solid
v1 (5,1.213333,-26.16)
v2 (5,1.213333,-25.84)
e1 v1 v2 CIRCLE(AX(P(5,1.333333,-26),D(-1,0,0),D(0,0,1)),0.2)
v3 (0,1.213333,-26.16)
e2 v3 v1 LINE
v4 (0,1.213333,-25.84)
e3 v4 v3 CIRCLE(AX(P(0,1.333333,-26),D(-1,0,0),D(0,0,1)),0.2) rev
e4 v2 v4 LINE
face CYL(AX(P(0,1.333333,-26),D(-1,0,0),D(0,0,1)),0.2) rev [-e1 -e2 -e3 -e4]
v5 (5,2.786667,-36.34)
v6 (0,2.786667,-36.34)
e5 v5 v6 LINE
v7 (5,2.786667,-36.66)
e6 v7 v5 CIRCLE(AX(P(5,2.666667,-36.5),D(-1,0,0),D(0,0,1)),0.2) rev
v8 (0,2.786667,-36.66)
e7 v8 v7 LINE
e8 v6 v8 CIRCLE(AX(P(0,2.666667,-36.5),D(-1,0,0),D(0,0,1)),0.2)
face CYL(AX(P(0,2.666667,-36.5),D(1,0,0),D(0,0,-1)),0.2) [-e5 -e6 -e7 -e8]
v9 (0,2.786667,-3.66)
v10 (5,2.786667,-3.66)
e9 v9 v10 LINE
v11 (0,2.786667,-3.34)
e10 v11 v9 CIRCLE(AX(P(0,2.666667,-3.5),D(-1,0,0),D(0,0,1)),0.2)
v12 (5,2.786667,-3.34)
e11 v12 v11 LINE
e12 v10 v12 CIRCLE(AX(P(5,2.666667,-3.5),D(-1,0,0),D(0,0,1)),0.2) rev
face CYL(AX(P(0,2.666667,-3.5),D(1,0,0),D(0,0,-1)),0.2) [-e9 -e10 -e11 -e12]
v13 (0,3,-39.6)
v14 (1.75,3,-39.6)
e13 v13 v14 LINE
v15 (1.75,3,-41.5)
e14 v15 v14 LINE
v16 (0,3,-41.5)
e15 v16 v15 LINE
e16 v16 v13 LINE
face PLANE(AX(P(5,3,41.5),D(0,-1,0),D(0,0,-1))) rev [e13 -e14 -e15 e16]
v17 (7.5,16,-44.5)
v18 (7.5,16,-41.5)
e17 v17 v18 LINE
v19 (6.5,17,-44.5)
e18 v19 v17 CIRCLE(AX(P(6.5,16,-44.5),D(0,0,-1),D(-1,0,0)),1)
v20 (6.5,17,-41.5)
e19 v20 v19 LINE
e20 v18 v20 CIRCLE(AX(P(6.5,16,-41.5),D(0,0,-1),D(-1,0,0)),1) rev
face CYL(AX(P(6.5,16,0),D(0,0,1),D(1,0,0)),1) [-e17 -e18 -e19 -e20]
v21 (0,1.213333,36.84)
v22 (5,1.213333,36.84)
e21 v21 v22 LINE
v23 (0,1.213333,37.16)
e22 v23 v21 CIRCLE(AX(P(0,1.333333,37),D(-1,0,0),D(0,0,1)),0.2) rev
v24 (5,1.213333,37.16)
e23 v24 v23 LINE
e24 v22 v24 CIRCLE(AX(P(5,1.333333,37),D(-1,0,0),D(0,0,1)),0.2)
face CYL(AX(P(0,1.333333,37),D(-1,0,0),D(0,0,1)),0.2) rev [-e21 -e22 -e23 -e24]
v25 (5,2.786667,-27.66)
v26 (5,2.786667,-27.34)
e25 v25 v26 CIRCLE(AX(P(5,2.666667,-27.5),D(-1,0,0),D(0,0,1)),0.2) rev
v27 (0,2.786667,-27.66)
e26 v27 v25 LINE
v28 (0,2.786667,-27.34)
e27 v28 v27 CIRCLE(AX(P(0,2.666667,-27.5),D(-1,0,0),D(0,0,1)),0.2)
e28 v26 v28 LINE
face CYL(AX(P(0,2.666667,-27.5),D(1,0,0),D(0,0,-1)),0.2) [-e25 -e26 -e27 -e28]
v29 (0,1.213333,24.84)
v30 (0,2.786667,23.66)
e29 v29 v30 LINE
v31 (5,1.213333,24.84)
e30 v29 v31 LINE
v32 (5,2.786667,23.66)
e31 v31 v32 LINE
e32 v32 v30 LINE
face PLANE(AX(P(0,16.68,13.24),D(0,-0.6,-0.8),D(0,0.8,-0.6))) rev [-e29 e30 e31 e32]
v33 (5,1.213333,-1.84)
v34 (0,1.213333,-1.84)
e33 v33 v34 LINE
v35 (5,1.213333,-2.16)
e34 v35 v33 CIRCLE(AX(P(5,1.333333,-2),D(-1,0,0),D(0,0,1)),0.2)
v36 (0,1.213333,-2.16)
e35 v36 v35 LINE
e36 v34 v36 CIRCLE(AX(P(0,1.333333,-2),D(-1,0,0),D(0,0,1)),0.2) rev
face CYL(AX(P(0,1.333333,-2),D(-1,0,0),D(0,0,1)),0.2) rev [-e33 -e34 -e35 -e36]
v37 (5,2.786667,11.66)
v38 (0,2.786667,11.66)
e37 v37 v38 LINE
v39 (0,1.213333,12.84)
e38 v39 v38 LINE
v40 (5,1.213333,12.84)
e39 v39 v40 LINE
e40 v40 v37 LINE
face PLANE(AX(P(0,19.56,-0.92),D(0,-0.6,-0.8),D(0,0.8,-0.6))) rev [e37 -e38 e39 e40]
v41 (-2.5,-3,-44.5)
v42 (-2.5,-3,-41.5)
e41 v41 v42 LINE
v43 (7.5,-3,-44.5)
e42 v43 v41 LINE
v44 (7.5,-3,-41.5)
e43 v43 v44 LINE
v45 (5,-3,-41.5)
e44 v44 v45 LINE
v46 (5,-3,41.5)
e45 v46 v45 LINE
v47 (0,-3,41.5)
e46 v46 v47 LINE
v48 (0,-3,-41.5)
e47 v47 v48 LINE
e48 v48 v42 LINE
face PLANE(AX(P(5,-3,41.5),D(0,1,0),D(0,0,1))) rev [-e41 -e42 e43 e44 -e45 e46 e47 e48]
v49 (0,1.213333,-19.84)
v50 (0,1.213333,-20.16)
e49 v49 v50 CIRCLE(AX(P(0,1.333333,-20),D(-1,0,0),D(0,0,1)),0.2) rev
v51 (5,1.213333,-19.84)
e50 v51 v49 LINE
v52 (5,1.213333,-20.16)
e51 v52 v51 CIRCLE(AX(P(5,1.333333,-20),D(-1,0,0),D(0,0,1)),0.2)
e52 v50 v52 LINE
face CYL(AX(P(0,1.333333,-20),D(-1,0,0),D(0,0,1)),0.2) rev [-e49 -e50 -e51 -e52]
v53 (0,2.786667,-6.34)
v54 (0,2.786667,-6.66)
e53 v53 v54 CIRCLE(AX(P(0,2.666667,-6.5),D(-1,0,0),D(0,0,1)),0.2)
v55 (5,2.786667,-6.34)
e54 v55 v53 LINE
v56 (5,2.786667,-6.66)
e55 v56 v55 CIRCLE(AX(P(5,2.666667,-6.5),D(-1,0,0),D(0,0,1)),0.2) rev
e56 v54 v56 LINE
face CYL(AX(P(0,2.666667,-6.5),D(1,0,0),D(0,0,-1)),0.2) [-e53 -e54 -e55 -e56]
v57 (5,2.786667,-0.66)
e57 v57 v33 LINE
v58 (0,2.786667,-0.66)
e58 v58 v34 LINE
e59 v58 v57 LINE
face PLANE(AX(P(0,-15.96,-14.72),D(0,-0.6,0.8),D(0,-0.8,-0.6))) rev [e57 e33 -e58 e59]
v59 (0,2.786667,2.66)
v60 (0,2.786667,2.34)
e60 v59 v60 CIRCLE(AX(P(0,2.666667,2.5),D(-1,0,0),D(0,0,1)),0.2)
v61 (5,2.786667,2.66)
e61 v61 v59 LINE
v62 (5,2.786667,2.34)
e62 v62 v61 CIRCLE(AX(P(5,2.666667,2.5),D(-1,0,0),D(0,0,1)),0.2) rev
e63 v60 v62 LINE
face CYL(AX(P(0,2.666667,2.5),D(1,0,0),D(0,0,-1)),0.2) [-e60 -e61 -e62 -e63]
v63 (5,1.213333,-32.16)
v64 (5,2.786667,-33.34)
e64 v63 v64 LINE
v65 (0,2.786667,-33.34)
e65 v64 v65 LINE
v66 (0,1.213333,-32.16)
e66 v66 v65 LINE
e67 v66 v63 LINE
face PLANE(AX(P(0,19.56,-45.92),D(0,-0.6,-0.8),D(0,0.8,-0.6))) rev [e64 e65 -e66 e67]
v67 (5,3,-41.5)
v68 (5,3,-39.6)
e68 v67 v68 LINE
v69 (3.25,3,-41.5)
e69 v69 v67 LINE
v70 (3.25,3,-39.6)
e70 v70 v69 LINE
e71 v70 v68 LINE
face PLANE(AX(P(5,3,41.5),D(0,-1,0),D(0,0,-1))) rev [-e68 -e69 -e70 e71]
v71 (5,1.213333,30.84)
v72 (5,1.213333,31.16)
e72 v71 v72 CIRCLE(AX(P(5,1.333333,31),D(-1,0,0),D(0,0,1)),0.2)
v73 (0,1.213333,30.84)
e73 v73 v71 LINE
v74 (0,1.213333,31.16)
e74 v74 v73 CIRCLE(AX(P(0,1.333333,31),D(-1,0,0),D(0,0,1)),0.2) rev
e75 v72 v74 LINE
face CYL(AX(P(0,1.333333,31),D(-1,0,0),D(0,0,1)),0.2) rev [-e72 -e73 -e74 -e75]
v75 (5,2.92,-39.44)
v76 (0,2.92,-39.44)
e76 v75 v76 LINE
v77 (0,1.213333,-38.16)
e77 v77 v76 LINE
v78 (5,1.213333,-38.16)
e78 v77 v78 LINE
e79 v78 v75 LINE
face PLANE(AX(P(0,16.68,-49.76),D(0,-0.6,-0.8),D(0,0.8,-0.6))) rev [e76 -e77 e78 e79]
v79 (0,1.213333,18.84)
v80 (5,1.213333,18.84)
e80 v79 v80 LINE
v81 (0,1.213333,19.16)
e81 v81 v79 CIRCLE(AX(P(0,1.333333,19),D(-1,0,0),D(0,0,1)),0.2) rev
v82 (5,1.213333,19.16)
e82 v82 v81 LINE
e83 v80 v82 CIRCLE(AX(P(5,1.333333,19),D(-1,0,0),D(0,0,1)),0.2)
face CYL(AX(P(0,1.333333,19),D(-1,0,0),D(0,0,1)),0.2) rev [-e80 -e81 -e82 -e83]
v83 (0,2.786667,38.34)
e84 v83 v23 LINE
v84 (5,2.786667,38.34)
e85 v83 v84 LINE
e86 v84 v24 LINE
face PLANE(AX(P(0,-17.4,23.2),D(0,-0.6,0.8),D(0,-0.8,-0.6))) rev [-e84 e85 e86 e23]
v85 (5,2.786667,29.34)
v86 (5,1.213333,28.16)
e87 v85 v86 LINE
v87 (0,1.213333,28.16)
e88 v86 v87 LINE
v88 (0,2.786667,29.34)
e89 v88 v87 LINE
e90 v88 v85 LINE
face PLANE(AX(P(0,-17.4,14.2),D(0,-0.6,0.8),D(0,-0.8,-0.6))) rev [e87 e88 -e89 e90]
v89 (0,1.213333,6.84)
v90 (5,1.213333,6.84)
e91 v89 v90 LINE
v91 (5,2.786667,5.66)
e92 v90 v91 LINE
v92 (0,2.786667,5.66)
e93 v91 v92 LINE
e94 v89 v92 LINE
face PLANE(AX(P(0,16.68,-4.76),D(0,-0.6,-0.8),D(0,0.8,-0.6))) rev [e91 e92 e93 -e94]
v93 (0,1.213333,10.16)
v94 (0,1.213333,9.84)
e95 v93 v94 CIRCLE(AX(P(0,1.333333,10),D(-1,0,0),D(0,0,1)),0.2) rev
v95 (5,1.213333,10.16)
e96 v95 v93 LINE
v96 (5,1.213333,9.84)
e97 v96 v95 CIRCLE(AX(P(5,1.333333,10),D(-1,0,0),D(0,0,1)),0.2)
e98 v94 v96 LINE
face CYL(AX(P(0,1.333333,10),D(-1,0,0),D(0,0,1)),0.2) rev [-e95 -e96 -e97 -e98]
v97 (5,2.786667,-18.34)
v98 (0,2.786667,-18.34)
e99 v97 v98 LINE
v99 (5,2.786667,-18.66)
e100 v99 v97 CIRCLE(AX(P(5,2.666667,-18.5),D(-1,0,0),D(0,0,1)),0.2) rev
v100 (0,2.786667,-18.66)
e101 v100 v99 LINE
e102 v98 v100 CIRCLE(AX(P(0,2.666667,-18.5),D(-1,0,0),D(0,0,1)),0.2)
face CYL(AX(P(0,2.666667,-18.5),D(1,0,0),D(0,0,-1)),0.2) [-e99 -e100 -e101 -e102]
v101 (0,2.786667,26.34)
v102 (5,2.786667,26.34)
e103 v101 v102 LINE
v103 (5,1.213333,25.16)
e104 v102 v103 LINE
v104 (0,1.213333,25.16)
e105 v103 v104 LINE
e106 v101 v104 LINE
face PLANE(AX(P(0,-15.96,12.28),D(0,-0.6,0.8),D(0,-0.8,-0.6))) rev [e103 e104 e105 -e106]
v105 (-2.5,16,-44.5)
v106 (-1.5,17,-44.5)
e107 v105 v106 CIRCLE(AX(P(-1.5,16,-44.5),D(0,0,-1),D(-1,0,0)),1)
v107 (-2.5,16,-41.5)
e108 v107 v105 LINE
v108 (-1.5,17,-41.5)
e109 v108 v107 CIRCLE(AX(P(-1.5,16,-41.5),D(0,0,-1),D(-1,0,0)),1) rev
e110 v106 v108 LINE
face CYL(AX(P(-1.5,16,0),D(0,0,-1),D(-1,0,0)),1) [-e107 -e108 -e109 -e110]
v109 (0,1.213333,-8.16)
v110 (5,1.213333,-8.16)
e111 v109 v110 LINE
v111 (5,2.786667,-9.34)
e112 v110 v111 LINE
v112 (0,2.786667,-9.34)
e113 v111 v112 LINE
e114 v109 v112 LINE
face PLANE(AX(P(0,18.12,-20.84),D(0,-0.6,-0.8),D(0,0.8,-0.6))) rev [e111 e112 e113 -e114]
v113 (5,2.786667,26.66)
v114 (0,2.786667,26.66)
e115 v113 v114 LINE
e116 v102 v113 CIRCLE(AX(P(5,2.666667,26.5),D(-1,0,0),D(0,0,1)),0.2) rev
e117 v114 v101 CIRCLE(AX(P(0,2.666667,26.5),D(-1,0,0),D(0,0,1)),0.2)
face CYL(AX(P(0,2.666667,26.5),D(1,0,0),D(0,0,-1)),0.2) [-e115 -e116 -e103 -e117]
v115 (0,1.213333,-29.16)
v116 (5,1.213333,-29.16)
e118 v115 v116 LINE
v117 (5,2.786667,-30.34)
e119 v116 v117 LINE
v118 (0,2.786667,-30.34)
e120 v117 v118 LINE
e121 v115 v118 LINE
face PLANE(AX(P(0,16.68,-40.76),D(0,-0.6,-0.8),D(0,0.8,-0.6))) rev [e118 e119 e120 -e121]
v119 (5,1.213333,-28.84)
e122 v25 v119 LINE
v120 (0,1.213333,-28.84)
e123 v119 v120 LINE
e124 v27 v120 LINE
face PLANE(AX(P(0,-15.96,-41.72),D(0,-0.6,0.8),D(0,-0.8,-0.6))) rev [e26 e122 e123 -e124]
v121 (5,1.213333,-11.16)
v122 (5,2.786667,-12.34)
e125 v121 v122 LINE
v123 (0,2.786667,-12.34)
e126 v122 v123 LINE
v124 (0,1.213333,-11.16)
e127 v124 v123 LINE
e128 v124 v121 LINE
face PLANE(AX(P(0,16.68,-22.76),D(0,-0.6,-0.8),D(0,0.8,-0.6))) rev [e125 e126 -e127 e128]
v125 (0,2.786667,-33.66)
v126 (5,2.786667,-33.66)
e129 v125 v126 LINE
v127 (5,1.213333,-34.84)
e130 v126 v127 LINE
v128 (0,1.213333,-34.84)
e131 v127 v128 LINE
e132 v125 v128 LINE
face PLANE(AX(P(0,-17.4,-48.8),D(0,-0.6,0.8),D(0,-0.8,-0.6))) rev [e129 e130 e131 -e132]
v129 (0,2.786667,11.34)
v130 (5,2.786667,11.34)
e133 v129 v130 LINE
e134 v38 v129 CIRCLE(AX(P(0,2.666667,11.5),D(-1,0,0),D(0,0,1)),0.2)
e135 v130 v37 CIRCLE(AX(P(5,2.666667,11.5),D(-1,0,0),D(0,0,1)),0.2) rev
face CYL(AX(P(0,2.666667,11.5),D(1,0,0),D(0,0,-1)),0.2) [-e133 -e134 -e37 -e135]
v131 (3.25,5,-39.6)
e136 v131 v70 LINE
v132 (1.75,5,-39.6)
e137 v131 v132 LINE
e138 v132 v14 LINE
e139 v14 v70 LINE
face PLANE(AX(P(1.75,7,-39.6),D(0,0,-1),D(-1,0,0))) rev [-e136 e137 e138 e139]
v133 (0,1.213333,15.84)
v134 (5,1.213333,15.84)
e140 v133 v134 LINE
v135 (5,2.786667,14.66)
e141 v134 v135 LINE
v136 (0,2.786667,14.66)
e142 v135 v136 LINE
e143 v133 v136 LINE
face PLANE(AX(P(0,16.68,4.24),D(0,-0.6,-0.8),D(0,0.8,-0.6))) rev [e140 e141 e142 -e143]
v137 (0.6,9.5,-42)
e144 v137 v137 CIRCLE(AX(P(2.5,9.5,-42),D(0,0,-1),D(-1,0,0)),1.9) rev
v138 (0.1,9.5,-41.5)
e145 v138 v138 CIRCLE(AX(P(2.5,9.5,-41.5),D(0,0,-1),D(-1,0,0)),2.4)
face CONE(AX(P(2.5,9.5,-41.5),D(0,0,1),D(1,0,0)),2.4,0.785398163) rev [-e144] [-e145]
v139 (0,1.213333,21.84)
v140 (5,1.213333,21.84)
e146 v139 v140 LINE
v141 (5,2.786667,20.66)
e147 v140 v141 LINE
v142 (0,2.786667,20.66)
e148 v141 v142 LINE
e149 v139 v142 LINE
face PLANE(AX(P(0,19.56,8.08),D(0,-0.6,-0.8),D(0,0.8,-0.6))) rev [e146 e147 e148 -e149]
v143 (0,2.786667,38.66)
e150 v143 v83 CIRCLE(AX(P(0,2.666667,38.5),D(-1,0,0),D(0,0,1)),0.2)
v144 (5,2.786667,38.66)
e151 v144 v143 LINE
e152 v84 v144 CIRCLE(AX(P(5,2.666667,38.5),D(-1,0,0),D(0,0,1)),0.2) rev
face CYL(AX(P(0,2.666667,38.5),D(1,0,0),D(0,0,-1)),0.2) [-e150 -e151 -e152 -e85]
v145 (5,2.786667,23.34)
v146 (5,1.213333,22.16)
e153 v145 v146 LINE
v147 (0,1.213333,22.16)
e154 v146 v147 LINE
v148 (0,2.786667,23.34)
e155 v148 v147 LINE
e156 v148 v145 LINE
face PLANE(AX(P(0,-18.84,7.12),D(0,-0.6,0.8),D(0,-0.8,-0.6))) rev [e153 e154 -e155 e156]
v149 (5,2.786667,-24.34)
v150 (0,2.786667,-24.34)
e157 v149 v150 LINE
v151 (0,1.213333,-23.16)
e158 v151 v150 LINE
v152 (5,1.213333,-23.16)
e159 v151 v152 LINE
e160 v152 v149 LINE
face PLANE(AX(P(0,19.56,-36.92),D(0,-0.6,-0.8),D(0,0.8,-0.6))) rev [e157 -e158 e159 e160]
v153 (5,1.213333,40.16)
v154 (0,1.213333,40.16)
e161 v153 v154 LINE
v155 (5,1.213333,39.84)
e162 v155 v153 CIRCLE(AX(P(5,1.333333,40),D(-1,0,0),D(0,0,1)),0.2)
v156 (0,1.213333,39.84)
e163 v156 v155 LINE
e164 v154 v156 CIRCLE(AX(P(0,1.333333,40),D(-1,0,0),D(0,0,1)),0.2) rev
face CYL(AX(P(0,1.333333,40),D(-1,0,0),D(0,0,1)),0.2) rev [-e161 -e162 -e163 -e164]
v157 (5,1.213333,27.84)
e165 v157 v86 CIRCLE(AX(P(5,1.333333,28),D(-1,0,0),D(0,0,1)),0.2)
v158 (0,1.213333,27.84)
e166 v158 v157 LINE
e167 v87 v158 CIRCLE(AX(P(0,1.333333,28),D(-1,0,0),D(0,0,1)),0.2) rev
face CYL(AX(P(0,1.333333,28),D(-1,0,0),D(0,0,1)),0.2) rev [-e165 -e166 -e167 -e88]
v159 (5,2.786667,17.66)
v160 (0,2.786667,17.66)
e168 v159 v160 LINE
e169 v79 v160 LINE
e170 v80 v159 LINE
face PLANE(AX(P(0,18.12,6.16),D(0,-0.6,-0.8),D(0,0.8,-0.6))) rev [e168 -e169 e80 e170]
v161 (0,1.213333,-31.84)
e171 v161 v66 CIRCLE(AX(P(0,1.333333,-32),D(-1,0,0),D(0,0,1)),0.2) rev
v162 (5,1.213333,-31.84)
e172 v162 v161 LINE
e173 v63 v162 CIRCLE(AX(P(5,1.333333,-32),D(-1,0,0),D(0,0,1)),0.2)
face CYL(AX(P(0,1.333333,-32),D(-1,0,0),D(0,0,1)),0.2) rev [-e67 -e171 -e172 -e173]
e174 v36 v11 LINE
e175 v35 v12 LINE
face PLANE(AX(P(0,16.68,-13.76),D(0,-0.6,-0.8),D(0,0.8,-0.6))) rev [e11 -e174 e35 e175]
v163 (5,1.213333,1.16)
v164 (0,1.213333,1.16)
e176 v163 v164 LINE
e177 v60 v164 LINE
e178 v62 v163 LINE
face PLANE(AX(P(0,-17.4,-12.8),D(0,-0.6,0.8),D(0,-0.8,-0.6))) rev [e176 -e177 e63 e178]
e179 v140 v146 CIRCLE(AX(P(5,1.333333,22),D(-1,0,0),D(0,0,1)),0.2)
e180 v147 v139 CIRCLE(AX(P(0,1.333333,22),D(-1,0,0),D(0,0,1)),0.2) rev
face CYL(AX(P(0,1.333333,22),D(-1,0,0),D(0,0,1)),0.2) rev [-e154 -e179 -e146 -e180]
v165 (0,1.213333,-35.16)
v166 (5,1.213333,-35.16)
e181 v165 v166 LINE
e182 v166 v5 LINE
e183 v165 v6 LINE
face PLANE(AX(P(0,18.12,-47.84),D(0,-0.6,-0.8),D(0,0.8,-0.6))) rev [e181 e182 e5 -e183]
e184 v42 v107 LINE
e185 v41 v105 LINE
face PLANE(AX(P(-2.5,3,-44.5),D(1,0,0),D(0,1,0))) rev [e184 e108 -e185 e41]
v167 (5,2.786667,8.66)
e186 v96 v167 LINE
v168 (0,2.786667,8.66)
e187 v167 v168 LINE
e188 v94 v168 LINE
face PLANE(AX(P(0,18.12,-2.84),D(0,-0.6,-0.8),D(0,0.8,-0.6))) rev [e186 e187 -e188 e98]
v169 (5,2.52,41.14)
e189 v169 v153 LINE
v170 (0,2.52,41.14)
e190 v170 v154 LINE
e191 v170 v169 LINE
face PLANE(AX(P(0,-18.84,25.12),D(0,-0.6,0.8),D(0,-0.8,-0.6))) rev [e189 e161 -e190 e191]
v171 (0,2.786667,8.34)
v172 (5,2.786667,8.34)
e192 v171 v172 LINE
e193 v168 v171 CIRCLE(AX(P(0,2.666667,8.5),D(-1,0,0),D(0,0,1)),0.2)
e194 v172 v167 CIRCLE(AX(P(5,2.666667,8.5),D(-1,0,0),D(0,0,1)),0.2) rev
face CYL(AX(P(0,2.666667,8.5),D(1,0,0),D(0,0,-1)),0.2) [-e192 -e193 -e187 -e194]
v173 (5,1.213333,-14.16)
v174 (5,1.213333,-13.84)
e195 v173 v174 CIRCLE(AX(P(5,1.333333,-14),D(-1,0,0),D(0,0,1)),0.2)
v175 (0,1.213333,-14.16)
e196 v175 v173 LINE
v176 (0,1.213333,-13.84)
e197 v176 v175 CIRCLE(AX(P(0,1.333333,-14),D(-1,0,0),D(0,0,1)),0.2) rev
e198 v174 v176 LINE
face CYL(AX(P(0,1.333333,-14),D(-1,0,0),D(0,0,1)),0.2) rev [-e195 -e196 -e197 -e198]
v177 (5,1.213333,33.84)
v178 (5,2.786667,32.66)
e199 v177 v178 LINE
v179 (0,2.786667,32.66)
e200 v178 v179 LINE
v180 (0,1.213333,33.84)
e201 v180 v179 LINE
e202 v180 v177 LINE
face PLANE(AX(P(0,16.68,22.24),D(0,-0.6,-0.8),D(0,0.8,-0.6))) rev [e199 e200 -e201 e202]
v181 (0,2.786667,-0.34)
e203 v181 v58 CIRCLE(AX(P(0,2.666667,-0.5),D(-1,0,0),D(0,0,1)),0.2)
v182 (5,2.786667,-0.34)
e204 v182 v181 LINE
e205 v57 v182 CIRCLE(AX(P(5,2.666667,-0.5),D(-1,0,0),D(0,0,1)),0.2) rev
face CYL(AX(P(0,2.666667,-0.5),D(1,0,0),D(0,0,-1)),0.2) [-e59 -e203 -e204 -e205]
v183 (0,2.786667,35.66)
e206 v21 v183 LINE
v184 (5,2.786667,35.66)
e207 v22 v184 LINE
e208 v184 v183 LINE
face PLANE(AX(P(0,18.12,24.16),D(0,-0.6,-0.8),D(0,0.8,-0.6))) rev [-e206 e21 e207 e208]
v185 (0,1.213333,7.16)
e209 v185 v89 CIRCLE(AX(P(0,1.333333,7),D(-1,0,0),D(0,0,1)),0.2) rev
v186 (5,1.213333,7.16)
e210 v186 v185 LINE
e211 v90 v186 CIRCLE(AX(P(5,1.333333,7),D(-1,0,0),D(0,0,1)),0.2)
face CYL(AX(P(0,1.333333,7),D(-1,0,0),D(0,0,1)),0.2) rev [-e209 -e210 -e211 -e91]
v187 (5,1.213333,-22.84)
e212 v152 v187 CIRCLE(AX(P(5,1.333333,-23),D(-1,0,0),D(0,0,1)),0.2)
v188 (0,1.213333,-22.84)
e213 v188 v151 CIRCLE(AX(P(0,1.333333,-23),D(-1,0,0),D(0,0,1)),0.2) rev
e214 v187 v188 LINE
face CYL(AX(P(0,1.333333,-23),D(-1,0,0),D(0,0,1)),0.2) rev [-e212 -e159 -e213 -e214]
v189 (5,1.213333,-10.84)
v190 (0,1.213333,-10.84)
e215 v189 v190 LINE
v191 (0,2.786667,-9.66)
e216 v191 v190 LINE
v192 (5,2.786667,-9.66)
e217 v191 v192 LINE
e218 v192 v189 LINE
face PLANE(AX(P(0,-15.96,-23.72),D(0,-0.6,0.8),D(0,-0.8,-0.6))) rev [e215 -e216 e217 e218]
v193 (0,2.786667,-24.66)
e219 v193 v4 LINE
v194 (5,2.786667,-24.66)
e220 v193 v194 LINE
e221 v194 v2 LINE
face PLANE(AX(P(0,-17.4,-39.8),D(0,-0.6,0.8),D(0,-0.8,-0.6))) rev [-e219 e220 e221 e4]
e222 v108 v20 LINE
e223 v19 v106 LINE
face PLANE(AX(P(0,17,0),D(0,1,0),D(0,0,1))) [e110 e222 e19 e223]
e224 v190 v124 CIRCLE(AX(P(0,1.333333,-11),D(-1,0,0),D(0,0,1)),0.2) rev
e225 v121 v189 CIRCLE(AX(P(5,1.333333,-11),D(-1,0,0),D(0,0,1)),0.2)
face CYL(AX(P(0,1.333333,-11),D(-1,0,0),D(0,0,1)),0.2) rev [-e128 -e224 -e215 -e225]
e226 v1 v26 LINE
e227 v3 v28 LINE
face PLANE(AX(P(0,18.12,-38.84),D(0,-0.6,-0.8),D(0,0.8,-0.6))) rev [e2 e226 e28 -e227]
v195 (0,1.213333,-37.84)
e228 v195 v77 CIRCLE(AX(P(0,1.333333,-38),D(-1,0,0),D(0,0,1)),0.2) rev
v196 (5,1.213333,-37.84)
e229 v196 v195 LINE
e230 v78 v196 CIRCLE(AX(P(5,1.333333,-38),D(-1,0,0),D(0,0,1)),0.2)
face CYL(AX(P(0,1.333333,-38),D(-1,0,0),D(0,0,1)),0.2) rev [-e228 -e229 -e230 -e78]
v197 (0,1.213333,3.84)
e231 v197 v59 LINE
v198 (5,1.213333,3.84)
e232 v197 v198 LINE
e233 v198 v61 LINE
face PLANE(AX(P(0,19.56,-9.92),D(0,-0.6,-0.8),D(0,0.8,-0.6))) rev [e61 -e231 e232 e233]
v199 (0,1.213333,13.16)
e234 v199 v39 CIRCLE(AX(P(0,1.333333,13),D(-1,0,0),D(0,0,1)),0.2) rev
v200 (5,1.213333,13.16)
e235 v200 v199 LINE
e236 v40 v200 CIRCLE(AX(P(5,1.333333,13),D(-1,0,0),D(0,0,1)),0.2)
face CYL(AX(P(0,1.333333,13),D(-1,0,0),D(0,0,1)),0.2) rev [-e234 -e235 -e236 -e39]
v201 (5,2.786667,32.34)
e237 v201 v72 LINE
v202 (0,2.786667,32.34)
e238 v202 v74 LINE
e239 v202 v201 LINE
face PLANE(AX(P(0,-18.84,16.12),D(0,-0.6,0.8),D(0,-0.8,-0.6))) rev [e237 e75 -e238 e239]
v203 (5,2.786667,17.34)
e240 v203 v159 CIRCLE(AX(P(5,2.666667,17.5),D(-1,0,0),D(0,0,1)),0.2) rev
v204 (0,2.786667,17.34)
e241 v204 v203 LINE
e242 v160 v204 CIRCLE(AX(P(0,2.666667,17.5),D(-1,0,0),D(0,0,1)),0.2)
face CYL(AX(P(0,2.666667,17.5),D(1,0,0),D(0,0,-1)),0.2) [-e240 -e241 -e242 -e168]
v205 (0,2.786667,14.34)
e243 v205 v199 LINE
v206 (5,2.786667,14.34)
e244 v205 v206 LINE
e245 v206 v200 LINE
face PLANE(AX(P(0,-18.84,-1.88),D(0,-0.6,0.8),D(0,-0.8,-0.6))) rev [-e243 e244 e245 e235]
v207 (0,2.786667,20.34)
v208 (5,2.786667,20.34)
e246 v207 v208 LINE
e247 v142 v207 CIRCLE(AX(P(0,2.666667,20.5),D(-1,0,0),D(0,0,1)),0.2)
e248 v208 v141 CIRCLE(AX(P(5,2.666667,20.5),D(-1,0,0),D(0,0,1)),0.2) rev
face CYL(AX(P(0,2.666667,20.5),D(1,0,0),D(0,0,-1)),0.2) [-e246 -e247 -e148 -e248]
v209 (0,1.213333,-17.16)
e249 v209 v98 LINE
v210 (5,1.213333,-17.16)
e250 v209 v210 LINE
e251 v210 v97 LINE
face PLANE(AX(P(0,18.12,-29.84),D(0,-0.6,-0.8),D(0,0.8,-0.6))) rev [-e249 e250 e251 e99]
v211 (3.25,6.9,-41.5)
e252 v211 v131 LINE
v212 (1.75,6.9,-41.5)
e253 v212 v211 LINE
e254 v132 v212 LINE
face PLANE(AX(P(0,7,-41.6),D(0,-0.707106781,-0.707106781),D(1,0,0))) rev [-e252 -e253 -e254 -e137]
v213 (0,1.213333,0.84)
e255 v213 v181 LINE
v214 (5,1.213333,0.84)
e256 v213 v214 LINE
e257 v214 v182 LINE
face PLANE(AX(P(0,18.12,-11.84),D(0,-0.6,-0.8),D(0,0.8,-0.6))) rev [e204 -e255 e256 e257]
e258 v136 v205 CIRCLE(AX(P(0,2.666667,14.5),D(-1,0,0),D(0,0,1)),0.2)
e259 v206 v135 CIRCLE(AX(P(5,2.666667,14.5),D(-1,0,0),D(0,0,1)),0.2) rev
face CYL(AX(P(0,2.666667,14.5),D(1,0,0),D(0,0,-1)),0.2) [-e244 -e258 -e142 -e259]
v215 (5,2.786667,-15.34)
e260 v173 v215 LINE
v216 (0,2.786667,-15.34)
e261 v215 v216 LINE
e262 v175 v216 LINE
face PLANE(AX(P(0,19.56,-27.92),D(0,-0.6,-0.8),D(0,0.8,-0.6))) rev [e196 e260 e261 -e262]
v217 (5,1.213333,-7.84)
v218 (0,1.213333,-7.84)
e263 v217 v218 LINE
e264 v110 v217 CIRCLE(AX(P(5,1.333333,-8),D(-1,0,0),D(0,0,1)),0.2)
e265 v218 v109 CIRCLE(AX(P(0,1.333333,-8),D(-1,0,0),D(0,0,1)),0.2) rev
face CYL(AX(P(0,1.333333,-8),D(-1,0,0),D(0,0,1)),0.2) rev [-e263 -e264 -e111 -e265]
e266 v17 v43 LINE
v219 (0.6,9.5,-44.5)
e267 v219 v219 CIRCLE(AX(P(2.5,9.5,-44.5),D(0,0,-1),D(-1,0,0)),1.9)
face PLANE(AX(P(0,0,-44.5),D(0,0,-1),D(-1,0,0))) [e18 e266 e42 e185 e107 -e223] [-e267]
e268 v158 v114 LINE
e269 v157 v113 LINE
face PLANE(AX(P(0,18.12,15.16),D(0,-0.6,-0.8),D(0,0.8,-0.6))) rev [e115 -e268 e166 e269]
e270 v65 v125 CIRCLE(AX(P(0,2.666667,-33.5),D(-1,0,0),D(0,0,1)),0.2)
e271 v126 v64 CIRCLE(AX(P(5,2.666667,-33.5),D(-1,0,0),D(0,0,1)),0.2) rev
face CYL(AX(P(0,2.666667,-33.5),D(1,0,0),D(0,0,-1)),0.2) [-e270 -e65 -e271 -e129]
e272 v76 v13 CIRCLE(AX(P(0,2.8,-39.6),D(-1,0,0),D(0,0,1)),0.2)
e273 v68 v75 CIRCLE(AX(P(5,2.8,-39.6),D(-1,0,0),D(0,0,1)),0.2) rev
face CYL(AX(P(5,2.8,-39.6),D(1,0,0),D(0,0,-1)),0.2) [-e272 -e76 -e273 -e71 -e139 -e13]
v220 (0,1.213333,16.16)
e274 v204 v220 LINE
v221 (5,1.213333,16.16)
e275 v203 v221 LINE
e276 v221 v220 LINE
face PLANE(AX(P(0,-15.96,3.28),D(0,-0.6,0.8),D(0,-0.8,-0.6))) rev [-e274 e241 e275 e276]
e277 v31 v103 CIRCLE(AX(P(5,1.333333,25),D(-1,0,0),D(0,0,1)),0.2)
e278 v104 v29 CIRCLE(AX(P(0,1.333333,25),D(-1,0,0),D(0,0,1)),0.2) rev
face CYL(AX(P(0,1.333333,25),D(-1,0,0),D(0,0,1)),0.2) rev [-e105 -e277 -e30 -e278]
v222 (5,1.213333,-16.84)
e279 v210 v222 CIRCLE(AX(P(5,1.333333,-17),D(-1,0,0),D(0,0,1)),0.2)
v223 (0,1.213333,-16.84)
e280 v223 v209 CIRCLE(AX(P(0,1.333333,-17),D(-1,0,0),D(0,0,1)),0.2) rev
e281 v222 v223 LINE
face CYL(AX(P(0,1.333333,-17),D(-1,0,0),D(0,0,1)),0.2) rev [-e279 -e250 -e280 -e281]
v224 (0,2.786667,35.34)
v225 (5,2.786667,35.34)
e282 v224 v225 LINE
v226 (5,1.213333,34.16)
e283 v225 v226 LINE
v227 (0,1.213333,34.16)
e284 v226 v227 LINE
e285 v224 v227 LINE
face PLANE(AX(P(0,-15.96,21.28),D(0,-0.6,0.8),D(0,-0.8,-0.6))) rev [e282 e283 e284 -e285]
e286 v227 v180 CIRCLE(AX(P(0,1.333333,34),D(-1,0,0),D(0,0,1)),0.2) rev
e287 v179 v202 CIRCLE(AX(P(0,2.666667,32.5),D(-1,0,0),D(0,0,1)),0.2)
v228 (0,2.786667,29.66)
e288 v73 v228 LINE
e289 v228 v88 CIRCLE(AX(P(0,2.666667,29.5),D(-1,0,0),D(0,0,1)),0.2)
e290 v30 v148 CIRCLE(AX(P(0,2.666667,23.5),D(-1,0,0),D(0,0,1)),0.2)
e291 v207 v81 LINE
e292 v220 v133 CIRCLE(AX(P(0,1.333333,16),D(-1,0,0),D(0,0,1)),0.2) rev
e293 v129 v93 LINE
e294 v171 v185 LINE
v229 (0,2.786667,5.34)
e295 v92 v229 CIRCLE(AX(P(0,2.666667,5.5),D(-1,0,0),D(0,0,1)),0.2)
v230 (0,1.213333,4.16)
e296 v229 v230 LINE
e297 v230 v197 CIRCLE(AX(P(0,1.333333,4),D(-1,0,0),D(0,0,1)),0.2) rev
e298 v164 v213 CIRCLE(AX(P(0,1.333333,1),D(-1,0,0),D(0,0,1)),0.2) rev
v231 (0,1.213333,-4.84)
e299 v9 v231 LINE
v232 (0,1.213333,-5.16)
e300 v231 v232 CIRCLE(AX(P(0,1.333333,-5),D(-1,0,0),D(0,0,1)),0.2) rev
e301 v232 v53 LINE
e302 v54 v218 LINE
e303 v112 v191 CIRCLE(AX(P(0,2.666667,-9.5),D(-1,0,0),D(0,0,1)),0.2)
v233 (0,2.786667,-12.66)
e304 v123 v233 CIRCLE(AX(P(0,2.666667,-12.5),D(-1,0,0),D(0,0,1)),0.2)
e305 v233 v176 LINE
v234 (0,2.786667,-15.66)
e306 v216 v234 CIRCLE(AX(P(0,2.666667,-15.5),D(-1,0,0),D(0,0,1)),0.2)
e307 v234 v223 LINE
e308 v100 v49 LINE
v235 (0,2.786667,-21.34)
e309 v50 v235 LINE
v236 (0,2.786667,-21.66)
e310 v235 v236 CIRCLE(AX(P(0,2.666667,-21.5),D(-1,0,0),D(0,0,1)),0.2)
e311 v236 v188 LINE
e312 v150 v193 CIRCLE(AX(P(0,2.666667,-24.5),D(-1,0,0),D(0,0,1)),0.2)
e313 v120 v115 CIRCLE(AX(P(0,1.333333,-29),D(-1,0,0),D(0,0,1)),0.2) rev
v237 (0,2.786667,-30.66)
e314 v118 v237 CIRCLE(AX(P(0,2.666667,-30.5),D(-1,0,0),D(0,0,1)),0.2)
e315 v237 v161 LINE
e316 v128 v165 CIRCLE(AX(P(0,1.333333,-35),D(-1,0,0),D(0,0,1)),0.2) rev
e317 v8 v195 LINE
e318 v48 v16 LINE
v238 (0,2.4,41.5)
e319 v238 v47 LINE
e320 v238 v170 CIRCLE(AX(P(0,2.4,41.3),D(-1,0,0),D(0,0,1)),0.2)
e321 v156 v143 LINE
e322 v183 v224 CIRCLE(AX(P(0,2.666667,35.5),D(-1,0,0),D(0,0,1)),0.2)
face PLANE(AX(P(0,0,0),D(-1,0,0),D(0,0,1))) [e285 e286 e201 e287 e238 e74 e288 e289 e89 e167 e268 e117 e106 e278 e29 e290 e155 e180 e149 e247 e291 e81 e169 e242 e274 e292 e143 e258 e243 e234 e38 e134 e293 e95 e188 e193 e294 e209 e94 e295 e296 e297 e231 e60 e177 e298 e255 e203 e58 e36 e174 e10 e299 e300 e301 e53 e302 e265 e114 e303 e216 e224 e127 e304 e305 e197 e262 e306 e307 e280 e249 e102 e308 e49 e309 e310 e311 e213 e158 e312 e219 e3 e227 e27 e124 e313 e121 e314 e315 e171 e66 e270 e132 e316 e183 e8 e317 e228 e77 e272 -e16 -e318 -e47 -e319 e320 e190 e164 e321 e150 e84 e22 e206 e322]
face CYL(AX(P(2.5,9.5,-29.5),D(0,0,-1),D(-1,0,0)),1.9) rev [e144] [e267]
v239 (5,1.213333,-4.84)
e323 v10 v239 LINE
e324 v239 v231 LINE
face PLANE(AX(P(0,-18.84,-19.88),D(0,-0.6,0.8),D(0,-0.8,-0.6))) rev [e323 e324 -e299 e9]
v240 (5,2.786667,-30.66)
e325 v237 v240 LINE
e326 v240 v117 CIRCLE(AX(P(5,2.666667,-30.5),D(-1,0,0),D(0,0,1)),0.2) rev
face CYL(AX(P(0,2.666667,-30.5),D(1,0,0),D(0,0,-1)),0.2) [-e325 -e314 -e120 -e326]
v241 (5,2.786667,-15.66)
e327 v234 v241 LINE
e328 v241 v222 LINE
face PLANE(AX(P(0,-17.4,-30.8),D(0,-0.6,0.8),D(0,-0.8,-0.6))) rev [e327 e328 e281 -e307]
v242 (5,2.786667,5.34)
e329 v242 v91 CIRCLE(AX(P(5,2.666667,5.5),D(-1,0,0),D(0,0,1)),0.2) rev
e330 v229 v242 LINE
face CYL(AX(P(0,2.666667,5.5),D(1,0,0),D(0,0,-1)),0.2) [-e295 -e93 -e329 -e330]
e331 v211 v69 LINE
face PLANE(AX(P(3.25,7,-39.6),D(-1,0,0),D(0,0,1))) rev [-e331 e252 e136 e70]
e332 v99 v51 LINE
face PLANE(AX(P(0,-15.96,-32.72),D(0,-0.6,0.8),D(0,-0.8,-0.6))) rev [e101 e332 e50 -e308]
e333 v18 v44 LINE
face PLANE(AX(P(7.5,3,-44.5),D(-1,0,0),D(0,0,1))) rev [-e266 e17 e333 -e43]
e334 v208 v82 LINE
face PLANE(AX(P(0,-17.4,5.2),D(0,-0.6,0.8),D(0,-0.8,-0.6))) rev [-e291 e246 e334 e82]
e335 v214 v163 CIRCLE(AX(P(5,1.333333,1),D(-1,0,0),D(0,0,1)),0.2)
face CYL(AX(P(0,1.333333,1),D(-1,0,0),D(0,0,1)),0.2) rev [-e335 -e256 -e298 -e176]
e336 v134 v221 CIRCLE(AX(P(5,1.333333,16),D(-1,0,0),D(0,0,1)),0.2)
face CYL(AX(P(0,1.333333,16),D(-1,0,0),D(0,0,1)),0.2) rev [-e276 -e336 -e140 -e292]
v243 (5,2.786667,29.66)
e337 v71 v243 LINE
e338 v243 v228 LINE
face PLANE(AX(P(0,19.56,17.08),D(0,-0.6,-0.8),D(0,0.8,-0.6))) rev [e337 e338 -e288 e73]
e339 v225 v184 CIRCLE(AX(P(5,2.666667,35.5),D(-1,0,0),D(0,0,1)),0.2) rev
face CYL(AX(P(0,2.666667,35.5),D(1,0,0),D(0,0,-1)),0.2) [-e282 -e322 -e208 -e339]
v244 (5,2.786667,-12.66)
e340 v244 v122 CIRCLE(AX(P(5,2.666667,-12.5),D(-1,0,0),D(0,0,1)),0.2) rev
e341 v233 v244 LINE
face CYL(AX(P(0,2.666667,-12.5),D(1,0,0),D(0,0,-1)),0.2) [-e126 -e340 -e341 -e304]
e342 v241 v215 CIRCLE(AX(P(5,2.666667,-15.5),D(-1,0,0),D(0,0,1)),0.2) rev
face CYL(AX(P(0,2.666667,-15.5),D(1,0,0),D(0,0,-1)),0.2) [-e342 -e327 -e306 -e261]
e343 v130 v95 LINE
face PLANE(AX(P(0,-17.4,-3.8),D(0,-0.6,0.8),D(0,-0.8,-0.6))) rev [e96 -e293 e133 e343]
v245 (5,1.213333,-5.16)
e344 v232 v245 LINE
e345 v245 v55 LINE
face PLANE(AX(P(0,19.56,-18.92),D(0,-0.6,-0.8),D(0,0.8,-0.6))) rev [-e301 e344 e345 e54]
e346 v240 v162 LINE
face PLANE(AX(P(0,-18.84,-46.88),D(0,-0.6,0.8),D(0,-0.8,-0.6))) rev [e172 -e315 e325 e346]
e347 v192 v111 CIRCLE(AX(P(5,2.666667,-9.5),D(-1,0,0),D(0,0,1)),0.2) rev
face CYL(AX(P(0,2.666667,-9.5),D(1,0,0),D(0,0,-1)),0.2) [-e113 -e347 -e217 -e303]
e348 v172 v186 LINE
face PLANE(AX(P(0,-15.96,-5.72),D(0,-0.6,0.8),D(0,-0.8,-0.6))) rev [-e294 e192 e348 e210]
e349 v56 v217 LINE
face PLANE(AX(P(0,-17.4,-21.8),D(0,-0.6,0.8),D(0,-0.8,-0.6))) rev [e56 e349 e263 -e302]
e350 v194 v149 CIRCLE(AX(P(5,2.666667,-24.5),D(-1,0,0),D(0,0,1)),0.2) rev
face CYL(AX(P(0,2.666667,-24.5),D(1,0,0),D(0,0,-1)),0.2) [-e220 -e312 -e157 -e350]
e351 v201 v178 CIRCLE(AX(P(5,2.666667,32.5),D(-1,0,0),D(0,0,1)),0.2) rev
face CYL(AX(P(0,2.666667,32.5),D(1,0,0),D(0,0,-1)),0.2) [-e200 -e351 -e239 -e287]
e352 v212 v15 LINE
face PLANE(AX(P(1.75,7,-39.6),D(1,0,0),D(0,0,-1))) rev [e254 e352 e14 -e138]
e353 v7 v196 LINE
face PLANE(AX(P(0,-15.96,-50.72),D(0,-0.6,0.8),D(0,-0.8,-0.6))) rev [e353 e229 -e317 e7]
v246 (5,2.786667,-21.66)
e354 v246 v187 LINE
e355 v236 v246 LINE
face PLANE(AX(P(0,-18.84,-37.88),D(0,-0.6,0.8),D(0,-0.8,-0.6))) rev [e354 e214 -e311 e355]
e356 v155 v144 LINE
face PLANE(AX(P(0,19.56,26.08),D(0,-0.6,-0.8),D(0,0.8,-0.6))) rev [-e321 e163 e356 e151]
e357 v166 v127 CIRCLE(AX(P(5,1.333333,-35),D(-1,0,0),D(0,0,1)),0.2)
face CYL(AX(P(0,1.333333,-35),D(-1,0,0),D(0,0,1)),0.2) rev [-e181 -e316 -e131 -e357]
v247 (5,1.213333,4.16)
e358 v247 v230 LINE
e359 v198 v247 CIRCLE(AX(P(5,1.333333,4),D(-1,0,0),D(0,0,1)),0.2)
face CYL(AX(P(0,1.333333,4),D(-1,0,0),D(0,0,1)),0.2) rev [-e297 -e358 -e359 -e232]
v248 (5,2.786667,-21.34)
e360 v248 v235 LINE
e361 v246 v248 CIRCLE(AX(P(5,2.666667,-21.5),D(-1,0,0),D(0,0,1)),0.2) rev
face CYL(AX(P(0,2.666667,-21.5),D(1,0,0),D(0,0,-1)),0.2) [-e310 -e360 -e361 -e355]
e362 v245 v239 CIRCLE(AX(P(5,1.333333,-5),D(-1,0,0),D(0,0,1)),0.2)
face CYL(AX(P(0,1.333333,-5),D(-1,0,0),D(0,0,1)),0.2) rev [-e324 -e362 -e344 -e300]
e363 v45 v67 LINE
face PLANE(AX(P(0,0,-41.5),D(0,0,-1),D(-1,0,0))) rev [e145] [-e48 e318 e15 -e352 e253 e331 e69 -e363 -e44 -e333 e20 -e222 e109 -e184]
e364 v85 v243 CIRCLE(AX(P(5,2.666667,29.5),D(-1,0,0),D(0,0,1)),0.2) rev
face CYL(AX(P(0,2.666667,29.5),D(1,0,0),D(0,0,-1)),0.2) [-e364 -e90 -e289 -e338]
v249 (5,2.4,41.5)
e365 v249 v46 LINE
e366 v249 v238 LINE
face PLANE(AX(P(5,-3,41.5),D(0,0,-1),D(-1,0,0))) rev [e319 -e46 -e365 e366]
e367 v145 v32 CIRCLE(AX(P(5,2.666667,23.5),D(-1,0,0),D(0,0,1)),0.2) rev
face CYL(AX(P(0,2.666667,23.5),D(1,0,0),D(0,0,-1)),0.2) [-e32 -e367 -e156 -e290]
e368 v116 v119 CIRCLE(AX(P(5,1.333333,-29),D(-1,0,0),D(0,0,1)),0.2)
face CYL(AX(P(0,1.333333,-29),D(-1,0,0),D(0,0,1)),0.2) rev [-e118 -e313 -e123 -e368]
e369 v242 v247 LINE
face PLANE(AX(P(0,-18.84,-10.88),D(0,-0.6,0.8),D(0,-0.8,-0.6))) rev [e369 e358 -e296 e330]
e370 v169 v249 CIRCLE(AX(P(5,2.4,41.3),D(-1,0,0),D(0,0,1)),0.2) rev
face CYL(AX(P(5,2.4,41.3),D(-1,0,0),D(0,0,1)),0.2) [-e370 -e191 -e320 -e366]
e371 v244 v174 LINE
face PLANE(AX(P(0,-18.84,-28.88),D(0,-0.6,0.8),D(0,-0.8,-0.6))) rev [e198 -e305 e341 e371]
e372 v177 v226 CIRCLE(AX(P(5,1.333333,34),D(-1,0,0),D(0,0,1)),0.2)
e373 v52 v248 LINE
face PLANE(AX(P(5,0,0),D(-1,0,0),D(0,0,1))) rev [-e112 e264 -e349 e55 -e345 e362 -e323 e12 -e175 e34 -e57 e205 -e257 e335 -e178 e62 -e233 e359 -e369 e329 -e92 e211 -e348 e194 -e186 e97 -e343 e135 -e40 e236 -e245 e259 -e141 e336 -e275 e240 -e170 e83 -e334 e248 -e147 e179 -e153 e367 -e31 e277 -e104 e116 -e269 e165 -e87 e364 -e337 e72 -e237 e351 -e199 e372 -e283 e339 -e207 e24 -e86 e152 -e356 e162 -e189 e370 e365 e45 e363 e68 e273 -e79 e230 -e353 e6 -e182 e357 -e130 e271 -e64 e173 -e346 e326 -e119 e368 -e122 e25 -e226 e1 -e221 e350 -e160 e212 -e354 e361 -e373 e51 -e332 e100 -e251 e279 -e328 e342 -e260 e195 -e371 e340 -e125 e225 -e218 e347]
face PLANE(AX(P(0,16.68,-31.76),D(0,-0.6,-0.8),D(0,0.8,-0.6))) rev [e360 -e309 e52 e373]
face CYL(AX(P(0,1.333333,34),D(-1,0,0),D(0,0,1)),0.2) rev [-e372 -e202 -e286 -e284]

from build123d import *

# Parameters (mm, degrees)
ESQUISSE1_W                      = 83
ESQUISSE1_H                      = 6
BOSS_EXTRU_1_DEPTH               = 5
ENL_V_MAT_EXTRU_1_DEPTH          = 5
CONG_1_R                         = 0.2
R_P_TITION_LIN_AIRE4_COUNT       = 9
R_P_TITION_LIN_AIRE4_PITCH       = 9
CONG_1_OF_R_P_TITION_LIN_AIRE4_R = 0.2
CONG_2_R                         = 0.2
ESQUISSE3_W                      = 10
ESQUISSE3_H                      = 6
BOSS_EXTRU_2_DEPTH               = 3
ESQUISSE4_W                      = 10
ESQUISSE4_H                      = 3
BOSS_EXTRU_3_DEPTH               = 14
ESQUISSE5_R                      = 1.9
ENL_V_MAT_EXTRU_2_DEPTH          = 15
CONG_3_R                         = 1
CHANFREIN1_SIZE                  = 0.5
ESQUISSE6_W                      = 1.5
ESQUISSE6_H                      = 1.9
BOSS_EXTRU_4_DEPTH               = 4
CHANFREIN2_SIZE                  = 2


with BuildPart() as part:
    # Esquisse1 → Boss.-Extru.1 (new body)
    with BuildSketch(Plane(origin=(0, 0, 0), x_dir=(0, 0, -1), z_dir=(1, 0, 0))):
        Rectangle(ESQUISSE1_W, ESQUISSE1_H)
    extrude(amount=BOSS_EXTRU_1_DEPTH)

    # Esquisse2 → Enlèv. mat.-Extru.1 (cut)
    with BuildSketch(Plane(origin=(5, 0, 0), x_dir=(0, 0, -1), z_dir=(1, 0, 0))):
        Polygon((-38.5, 3), (-41.5, 3), (-40, 1), align=None)
        Polygon((-35.5, 3), (-38.5, 3), (-37, 1), align=None)
        Polygon((-32.5, 3), (-35.5, 3), (-34, 1), align=None)
    enl_v_mat_extru_1 = extrude(amount=-ENL_V_MAT_EXTRU_1_DEPTH, mode=Mode.SUBTRACT)

    # Congé1
    cong_1_edges = [part.edges().sort_by_distance(p)[0] for p in [
        (2.5, 1, 40),
        (2.5, 3, 38.5),
        (2.5, 1, 34),
        (2.5, 1, 37),
        (2.5, 3, 35.5),
    ]]
    fillet(cong_1_edges, radius=CONG_1_R)

    # Répétition linéaire4: Enlèv. mat.-Extru.1 ×9
    with Locations(*[(0, 0, -i * R_P_TITION_LIN_AIRE4_PITCH) for i in range(1, R_P_TITION_LIN_AIRE4_COUNT)]):
        add(enl_v_mat_extru_1, mode=Mode.SUBTRACT)

    # Congé1 of Répétition linéaire4
    cong_1_of_r_p_tition_lin_aire4_edges = [part.edges().sort_by_distance(p)[0] for p in [
        (2.5, 1, 31),
        (2.5, 3, 29.5),
        (2.5, 1, 25),
        (2.5, 1, 28),
        (2.5, 3, 26.5),
        (2.5, 1, 22),
        (2.5, 3, 20.5),
        (2.5, 1, 16),
        (2.5, 1, 19),
        (2.5, 3, 17.5),
        (2.5, 1, 13),
        (2.5, 3, 11.5),
        (2.5, 1, 7),
        (2.5, 1, 10),
        (2.5, 3, 8.5),
        (2.5, 1, 4),
        (2.5, 3, 2.5),
        (2.5, 1, -2),
        (2.5, 1, 1),
        (2.5, 3, -0.5),
        (2.5, 1, -5),
        (2.5, 3, -6.5),
        (2.5, 1, -11),
        (2.5, 1, -8),
        (2.5, 3, -9.5),
        (2.5, 1, -14),
        (2.5, 3, -15.5),
        (2.5, 1, -20),
        (2.5, 1, -17),
        (2.5, 3, -18.5),
        (2.5, 1, -23),
        (2.5, 3, -24.5),
        (2.5, 1, -29),
        (2.5, 1, -26),
        (2.5, 3, -27.5),
        (2.5, 1, -32),
        (2.5, 3, -33.5),
        (2.5, 1, -38),
        (2.5, 1, -35),
        (2.5, 3, -36.5),
    ]]
    fillet(cong_1_of_r_p_tition_lin_aire4_edges, radius=CONG_1_OF_R_P_TITION_LIN_AIRE4_R)

    # Congé2
    cong_2_edges = [part.edges().sort_by_distance(p)[0] for p in [
        (2.5, 3, 23.5),
        (2.5, 3, 5.5),
        (2.5, 3, -12.5),
        (2.5, 3, -30.5),
        (2.5, 3, 14.5),
        (2.5, 3, -3.5),
        (2.5, 3, 32.5),
        (2.5, 3, -21.5),
        (2.5, 3, -39.5),
        (2.5, 3, 41.5),
    ]]
    fillet(cong_2_edges, radius=CONG_2_R)

    # Esquisse3 → Boss.-Extru.2 (add)
    with BuildSketch(Plane(origin=(0, 0, -41.5), x_dir=(-1, 0, 0), z_dir=(0, 0, -1))):
        with Locations((-2.5, 0)):
            Rectangle(ESQUISSE3_W, ESQUISSE3_H)
    extrude(amount=BOSS_EXTRU_2_DEPTH)

    # Esquisse4 → Boss.-Extru.3 (add)
    with BuildSketch(Plane(origin=(0, 3, 0), x_dir=(1, 0, 0), z_dir=(0, 1, 0))):
        with Locations((2.5, 43)):
            Rectangle(ESQUISSE4_W, ESQUISSE4_H)
    extrude(amount=BOSS_EXTRU_3_DEPTH)

    # Esquisse5 → Enlèv. mat.-Extru.2 (cut)
    with BuildSketch(Plane(origin=(0, 0, -44.5), x_dir=(-1, 0, 0), z_dir=(0, 0, -1))):
        with Locations((-2.5, 9.5)):
            Circle(ESQUISSE5_R)
    extrude(amount=-ENL_V_MAT_EXTRU_2_DEPTH, mode=Mode.SUBTRACT)

    # Congé3
    cong_3_edges = [part.edges().sort_by_distance(p)[0] for p in [
        (-2.5, 17, -43),
        (7.5, 17, -43),
    ]]
    fillet(cong_3_edges, radius=CONG_3_R)

    # Chanfrein1
    chanfrein1_edges = [part.edges().sort_by_distance(p)[0] for p in [
        (4.4, 9.5, -41.5),
    ]]
    chamfer(chanfrein1_edges, length=CHANFREIN1_SIZE)

    # Esquisse6 → Boss.-Extru.4 (add)
    with BuildSketch(Plane(origin=(0, 3, 0), x_dir=(1, 0, 0), z_dir=(0, 1, 0))):
        with Locations((2.5, 40.55)):
            Rectangle(ESQUISSE6_W, ESQUISSE6_H)
    extrude(amount=BOSS_EXTRU_4_DEPTH)

    # Chanfrein2
    # the kernel refuses this chamfer: 2 mm, written as the material it takes off along each edge
    with BuildSketch(Plane(origin=(-3.393365976, 7, -39.6), x_dir=(0, 0.02749587661058651, -0.9996219169112968), z_dir=(1, 0, 0))) as chanfrein2_piece_1_section:
        Polygon((CHANFREIN2_SIZE * 0.999621916911, -CHANFREIN2_SIZE * 0.0274958766106), (-CHANFREIN2_SIZE * 0.0274958766106, -CHANFREIN2_SIZE * 0.999621916911), (0, 0), align=None)
    chanfrein2_piece_1 = extrude(amount=11.786731952, mode=Mode.PRIVATE)
    chanfrein2_piece_1 = split(chanfrein2_piece_1, bisect_by=Plane(origin=(2.5, 6.33491081, -41.5), z_dir=(0, 0, 1)), keep=Keep.TOP, mode=Mode.PRIVATE)
    add(chanfrein2_piece_1, mode=Mode.SUBTRACT)


solid = part.part
